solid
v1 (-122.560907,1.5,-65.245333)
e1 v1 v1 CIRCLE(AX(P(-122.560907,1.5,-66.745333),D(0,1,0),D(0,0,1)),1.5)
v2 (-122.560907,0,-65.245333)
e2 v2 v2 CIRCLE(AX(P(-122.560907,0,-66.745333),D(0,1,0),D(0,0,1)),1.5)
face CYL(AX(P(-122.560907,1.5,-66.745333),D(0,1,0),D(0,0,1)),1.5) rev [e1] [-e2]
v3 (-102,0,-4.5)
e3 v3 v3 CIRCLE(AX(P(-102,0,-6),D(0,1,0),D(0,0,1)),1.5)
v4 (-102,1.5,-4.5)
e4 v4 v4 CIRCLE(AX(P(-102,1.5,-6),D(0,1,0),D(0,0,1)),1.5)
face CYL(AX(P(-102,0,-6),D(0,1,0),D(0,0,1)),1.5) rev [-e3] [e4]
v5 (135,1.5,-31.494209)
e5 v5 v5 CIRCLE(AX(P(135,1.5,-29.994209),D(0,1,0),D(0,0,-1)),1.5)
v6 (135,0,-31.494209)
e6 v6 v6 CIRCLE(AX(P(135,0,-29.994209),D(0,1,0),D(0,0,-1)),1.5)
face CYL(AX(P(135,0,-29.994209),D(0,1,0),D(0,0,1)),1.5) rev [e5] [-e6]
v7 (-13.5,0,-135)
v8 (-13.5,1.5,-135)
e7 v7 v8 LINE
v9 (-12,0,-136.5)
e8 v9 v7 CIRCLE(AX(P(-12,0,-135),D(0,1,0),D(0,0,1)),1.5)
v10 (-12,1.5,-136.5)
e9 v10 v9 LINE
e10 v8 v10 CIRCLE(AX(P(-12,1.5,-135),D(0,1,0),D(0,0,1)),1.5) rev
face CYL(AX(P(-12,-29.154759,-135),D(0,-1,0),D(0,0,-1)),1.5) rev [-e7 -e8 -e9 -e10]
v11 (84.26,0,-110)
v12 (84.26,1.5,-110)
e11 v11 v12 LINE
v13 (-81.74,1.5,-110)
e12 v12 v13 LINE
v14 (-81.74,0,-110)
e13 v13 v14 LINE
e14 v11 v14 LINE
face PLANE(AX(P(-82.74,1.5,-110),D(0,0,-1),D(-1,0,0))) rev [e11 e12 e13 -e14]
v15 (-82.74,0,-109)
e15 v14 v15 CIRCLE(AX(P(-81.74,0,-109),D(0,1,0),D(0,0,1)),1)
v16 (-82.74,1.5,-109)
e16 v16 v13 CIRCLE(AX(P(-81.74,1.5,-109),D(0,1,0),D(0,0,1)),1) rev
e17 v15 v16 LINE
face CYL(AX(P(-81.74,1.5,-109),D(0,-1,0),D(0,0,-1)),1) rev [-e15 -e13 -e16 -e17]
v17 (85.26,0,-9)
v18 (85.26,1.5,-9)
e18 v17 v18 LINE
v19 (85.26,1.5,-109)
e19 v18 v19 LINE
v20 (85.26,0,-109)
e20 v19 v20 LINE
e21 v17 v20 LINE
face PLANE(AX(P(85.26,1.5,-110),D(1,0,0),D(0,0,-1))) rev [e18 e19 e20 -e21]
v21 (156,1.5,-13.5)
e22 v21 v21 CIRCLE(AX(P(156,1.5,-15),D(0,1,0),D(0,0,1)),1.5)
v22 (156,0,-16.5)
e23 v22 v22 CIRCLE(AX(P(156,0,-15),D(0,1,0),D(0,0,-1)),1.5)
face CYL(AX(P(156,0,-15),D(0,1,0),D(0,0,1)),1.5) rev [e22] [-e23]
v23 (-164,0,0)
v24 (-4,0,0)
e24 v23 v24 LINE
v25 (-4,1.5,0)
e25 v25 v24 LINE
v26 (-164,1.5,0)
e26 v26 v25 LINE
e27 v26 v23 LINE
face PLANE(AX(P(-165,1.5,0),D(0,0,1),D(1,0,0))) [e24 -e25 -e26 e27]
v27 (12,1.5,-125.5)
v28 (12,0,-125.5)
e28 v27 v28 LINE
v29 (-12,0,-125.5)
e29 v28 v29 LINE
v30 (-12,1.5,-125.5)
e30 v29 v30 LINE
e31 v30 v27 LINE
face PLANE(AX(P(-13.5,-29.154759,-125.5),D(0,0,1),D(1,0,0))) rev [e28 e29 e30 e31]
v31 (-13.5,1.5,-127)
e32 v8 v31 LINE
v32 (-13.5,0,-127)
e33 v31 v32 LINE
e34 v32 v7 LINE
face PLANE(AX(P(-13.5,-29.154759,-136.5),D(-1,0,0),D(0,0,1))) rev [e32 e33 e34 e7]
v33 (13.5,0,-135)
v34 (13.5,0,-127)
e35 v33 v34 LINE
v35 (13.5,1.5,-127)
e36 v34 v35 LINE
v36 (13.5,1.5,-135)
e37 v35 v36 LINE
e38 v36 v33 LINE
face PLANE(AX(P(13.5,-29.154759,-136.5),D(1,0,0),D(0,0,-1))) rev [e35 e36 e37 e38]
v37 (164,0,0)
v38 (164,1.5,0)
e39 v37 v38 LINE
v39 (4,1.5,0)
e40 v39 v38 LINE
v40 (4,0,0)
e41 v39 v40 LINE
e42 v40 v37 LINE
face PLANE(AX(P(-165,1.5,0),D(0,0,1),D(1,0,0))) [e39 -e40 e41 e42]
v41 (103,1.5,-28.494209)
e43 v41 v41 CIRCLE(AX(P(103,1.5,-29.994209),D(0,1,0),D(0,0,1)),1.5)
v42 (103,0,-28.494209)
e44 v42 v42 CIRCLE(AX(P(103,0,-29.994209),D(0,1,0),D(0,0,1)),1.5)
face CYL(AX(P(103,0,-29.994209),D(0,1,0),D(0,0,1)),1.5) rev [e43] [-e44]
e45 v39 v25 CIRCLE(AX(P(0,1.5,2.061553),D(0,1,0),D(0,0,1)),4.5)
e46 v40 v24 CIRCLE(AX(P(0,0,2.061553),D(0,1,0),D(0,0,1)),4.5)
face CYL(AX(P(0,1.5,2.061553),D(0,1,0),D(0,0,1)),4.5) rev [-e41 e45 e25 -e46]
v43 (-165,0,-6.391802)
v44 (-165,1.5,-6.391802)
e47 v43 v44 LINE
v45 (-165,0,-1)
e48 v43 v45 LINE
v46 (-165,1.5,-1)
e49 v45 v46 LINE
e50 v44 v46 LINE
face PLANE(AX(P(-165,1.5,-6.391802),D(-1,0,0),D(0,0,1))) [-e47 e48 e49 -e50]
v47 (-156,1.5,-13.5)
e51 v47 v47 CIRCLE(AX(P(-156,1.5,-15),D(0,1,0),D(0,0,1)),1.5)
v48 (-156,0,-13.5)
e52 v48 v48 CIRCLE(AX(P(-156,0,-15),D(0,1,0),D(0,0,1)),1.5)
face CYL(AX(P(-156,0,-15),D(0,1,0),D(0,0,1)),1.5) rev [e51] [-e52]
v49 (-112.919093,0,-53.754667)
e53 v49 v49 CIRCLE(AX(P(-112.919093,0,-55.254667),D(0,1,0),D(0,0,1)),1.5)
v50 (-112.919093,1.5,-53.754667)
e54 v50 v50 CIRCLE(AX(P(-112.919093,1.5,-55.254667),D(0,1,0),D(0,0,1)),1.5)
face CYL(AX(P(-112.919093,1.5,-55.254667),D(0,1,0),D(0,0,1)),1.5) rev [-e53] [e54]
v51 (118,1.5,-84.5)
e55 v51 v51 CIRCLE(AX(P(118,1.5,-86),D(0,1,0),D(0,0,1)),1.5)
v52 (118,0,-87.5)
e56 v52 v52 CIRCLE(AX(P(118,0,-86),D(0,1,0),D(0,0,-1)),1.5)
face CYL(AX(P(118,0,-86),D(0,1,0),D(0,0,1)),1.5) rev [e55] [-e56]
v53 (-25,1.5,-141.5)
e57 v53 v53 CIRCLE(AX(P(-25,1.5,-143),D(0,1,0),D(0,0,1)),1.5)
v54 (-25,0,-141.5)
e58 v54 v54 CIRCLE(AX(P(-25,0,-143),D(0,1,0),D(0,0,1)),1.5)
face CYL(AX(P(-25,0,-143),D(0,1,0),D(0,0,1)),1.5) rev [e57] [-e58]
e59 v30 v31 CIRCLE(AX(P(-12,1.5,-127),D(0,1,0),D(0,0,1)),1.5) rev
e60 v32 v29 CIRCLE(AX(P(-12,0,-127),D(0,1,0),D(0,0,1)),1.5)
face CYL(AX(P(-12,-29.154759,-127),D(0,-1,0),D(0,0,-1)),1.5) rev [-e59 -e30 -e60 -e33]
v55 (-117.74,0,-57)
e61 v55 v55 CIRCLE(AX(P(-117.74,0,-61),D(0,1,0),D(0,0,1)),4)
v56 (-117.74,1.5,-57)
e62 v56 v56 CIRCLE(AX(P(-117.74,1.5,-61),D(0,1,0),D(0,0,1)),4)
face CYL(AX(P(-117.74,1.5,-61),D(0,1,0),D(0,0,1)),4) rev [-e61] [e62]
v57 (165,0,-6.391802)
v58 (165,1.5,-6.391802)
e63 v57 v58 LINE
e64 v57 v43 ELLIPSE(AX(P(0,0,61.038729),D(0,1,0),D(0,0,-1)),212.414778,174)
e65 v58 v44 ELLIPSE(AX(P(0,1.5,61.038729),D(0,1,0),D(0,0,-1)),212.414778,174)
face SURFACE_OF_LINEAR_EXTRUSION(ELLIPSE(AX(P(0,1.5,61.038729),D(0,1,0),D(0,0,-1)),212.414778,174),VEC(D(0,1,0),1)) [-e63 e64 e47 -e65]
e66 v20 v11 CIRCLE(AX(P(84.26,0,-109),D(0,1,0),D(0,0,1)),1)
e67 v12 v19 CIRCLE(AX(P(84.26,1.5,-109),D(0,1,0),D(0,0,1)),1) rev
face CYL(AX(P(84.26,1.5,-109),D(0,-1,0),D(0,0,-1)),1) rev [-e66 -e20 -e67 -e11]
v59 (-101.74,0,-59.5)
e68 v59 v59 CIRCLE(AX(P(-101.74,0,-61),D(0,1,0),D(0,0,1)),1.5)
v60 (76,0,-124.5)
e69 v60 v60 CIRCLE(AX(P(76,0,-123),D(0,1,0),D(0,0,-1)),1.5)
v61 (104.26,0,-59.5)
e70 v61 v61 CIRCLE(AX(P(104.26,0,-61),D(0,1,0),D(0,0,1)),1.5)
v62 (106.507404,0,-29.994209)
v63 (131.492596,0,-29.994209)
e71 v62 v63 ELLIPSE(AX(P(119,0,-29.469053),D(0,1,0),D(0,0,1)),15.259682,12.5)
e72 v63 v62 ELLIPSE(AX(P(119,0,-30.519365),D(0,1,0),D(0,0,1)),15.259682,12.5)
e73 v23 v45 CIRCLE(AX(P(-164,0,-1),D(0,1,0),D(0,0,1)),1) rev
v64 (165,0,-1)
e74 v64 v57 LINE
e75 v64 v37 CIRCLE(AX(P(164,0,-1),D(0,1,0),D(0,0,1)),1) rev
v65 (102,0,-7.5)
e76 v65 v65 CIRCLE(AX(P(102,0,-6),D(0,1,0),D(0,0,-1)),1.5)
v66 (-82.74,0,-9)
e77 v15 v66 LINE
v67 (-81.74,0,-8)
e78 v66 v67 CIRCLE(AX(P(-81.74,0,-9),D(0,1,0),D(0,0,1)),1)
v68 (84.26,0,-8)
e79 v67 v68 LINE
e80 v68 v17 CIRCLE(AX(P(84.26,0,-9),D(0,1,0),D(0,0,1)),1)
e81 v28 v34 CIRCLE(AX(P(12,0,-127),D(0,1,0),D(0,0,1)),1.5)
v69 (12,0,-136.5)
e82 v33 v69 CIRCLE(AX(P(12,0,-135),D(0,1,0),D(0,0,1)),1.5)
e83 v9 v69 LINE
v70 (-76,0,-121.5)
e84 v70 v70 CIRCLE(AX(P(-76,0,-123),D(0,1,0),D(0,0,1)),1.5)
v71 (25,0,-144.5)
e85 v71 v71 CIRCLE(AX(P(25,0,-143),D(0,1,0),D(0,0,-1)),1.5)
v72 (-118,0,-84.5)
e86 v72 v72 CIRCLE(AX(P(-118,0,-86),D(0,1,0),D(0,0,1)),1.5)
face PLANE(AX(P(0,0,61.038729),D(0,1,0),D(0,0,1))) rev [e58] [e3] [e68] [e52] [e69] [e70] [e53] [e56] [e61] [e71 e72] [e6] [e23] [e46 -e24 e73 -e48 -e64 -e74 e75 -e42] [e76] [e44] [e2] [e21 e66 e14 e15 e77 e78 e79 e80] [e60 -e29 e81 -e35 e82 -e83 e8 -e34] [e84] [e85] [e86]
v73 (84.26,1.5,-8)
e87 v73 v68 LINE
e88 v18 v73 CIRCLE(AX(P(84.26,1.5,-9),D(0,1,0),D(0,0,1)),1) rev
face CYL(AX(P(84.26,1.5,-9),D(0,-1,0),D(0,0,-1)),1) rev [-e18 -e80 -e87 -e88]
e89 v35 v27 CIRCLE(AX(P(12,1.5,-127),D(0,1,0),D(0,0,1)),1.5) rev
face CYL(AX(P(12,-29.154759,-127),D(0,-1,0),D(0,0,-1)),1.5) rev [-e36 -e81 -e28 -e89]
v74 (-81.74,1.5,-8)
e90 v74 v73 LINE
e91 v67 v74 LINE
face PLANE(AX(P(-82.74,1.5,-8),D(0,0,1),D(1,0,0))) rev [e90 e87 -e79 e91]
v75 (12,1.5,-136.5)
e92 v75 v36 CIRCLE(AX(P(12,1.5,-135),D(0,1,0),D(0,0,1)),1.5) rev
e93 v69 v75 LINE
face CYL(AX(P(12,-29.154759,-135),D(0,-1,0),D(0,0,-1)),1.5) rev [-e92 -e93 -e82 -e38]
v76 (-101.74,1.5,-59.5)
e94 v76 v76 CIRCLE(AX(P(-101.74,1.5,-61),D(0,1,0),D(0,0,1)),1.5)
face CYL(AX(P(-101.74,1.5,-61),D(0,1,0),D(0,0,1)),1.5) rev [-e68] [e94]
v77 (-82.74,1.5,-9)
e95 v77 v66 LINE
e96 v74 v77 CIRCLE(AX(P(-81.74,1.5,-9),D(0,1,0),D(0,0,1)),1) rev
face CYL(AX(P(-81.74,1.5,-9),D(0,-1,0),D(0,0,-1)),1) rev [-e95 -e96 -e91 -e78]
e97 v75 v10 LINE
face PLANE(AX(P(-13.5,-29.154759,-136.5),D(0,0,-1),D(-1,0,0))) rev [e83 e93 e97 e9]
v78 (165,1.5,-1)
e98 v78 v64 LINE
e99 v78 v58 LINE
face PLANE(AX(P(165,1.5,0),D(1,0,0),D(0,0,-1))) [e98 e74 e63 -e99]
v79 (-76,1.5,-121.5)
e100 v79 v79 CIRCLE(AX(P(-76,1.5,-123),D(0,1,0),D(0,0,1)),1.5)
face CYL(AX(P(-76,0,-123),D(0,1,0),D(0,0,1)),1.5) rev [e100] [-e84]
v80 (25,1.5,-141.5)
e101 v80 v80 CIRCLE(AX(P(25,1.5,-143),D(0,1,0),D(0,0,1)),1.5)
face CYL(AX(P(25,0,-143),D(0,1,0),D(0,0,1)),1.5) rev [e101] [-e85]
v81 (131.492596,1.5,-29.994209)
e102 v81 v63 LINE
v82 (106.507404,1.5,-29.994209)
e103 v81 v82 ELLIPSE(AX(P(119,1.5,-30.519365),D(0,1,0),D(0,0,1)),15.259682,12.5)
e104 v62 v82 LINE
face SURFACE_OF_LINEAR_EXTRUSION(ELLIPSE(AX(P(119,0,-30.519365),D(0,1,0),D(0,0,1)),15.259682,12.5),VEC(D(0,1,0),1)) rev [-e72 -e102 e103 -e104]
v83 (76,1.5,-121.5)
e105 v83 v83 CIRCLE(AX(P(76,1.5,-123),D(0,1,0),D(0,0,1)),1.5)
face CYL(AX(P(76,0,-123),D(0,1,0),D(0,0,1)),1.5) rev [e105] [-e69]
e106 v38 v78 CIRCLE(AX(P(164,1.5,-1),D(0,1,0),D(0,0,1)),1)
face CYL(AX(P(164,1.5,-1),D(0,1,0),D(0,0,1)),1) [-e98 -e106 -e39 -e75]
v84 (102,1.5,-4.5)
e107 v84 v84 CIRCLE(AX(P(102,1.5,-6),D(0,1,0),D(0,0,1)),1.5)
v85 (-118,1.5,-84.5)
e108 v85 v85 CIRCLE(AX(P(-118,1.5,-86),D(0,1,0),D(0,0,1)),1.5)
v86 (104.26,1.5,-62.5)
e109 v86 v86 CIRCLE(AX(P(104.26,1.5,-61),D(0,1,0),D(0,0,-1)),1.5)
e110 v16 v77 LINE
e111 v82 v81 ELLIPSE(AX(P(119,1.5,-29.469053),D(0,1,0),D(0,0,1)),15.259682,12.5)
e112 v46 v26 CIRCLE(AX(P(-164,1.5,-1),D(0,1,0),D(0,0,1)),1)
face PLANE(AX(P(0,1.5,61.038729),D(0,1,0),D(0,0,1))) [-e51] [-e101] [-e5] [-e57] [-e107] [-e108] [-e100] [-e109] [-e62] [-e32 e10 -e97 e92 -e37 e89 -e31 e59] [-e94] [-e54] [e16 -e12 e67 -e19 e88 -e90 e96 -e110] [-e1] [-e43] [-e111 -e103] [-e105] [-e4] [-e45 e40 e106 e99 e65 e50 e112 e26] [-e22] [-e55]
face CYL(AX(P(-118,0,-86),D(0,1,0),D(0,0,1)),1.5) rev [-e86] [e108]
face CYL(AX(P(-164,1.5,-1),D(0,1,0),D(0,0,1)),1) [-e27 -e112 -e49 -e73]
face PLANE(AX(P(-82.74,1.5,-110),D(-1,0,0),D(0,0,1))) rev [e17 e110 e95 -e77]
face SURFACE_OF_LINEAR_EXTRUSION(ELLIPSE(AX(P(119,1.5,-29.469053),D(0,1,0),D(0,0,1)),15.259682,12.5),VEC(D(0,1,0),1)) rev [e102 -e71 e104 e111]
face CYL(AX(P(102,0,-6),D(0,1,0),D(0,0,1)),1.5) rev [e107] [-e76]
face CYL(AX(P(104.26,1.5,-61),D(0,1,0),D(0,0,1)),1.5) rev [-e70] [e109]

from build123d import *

# Parameters (mm, degrees)
BOSS_EXTRU_1_DEPTH      = 1.5
ESQUISSE4_R             = 4
ESQUISSE4_R_2           = 1.5
ESQUISSE4_W             = 168
ESQUISSE4_H             = 102
ENL_V_MAT_EXTRU_3_DEPTH = 3
ENL_V_MAT_EXTRU_4_DEPTH = 1.5
ESQUISSE11_R            = 1.5
ENL_V_MAT_EXTRU_5_DEPTH = 1.5
CONG_1_R                = 1
ESQUISSE12_R            = 1.5
ENL_V_MAT_EXTRU_6_DEPTH = 224.924001117
ESQUISSE14_W            = 27
ESQUISSE14_H            = 11
ENL_V_MAT_EXTRU_7_DEPTH = 1.5
CONG_2_R                = 1.5


# Read off the part's stored shape, not the designer's step: Enlèv. mat.-Extru.4
with BuildPart() as part:
    # Esquisse1 → Boss.-Extru.1 (new body)
    with BuildSketch(Plane(origin=(0, 0, 0), x_dir=(1, 0, 0), z_dir=(0, 1, 0))):
        with BuildLine():
            Line((-165, 6.391802297), (-165, 0))
            Line((-165, 0), (165, 0))
            Line((165, 0), (165, 6.391802297))
            add(Edge.make_bspline(
                [(165, 6.391802297), (0, 608.094924715), (-165, 6.391802297)],
                knots=[1.893832827, 1.893832827, 1.893832827, 4.38935248, 4.38935248, 4.38935248], degree=2, weights=[1, 0.317447459, 1]))
        make_face()
    extrude(amount=BOSS_EXTRU_1_DEPTH)

    # Esquisse4 → Enlèv. mat.-Extru.3 (cut)
    with BuildSketch(Plane(origin=(0, 1.5, 0), x_dir=(1, 0, 0), z_dir=(0, 1, 0))):
        with Locations(Location((-117.74, 61, 0), (0, 0, 270))):
            Circle(ESQUISSE4_R)
        with Locations(Location((-112.919092927, 55.254666677, 0), (0, 0, 270))):
            Circle(ESQUISSE4_R_2)
        with Locations(Location((-122.560907073, 66.745333323, 0), (0, 0, 270))):
            Circle(ESQUISSE4_R_2)
        with Locations(Location((-101.74, 61, 0), (0, 0, 270))):
            Circle(ESQUISSE4_R_2)
        with Locations(Location((104.26, 61, 0), (0, 0, 270))):
            Circle(ESQUISSE4_R_2)
        with Locations((1.26, 59)):
            Rectangle(ESQUISSE4_W, ESQUISSE4_H)
    extrude(amount=-ENL_V_MAT_EXTRU_3_DEPTH, mode=Mode.SUBTRACT)

    # Enlèv. mat.-Extru.4 outline → Enlèv. mat.-Extru.4 (cut)
    with BuildSketch(Plane(origin=(0, 0, 0), x_dir=(1, 0, 0), z_dir=(0, 1, 0))):
        with BuildLine():
            add(Edge.make_bspline(
                [(131.492595534, 29.994209065), (131.937846155, 45.779047079), (119, 45.779047079), (106.062153845, 45.779047079), (106.507404466, 29.994209065)],
                knots=[1.536374944, 1.536374944, 1.536374944, 3.141592654, 3.141592654, 4.746810363, 4.746810363, 4.746810363], degree=2, weights=[1, 0.694832863, 1, 0.694832863, 1]))
            add(Edge.make_bspline(
                [(106.507404466, 29.994209065), (106.062153845, 14.209371052), (119, 14.209371052), (131.937846155, 14.209371052), (131.492595534, 29.994209065)],
                knots=[4.677967597, 4.677967597, 4.677967597, 6.283185307, 6.283185307, 7.888403017, 7.888403017, 7.888403017], degree=2, weights=[1, 0.694832863, 1, 0.694832863, 1]))
        make_face()
    extrude(amount=ENL_V_MAT_EXTRU_4_DEPTH, mode=Mode.SUBTRACT)

    # Esquisse11 → Enlèv. mat.-Extru.5 (cut)
    with BuildSketch(Plane(origin=(0, 1.5, 0), x_dir=(1, 0, 0), z_dir=(0, 1, 0))):
        with Locations(Location((103, 29.994209065, 0), (0, 0, 270))):
            Circle(ESQUISSE11_R)
        with Locations(Location((135, 29.994209065, 0), (0, 0, 90))):
            Circle(ESQUISSE11_R)
    extrude(amount=-ENL_V_MAT_EXTRU_5_DEPTH, mode=Mode.SUBTRACT)

    # Congé1
    cong_1_edges = [part.edges().sort_by_distance(p)[0] for p in [
        (-82.74, 0.75, -110),
        (-82.74, 0.75, -8),
        (85.26, 0.75, -8),
        (85.26, 0.75, -110),
        (165, 0.75, 0),
        (-165, 0.75, 0),
    ]]
    fillet(cong_1_edges, radius=CONG_1_R)

    # Esquisse12 → Enlèv. mat.-Extru.6 (cut, through all)
    with BuildSketch(Plane(origin=(0, 1.5, 0), x_dir=(1, 0, 0), z_dir=(0, 1, 0))):
        with Locations(Location((-156, 15, 0), (0, 0, 270))):
            Circle(ESQUISSE12_R)
        with Locations(Location((-76, 123, 0), (0, 0, 270))):
            Circle(ESQUISSE12_R)
        with Locations(Location((-25, 143, 0), (0, 0, 270))):
            Circle(ESQUISSE12_R)
        with Locations(Location((25, 143, 0), (0, 0, 270))):
            Circle(ESQUISSE12_R)
        with Locations(Location((76, 123, 0), (0, 0, 270))):
            Circle(ESQUISSE12_R)
        with Locations(Location((156, 15, 0), (0, 0, 270))):
            Circle(ESQUISSE12_R)
        with Locations(Location((-102, 6, 0), (0, 0, 270))):
            Circle(ESQUISSE12_R)
        with Locations(Location((102, 6, 0), (0, 0, 270))):
            Circle(ESQUISSE12_R)
        with Locations(Location((-118, 86, 0), (0, 0, 270))):
            Circle(ESQUISSE12_R)
        with Locations(Location((118, 86, 0), (0, 0, 270))):
            Circle(ESQUISSE12_R)
        with BuildLine():
            Line((-4, 0), (4, 0))
            ThreePointArc((4, 0), (0, 2.438447187), (-4, 0))
        make_face()
    extrude(amount=-ENL_V_MAT_EXTRU_6_DEPTH, mode=Mode.SUBTRACT)

    # Esquisse14 → Enlèv. mat.-Extru.7 (cut)
    with BuildSketch(Plane(origin=(0, 1.5, 0), x_dir=(1, 0, 0), z_dir=(0, 1, 0))):
        with Locations((0, 131)):
            Rectangle(ESQUISSE14_W, ESQUISSE14_H)
    extrude(amount=-ENL_V_MAT_EXTRU_7_DEPTH, mode=Mode.SUBTRACT)

    # Congé2
    cong_2_edges = [part.edges().sort_by_distance(p)[0] for p in [
        (-13.5, 0.75, -125.5),
        (-13.5, 0.75, -136.5),
        (13.5, 0.75, -136.5),
        (13.5, 0.75, -125.5),
    ]]
    fillet(cong_2_edges, radius=CONG_2_R)


solid = part.part
